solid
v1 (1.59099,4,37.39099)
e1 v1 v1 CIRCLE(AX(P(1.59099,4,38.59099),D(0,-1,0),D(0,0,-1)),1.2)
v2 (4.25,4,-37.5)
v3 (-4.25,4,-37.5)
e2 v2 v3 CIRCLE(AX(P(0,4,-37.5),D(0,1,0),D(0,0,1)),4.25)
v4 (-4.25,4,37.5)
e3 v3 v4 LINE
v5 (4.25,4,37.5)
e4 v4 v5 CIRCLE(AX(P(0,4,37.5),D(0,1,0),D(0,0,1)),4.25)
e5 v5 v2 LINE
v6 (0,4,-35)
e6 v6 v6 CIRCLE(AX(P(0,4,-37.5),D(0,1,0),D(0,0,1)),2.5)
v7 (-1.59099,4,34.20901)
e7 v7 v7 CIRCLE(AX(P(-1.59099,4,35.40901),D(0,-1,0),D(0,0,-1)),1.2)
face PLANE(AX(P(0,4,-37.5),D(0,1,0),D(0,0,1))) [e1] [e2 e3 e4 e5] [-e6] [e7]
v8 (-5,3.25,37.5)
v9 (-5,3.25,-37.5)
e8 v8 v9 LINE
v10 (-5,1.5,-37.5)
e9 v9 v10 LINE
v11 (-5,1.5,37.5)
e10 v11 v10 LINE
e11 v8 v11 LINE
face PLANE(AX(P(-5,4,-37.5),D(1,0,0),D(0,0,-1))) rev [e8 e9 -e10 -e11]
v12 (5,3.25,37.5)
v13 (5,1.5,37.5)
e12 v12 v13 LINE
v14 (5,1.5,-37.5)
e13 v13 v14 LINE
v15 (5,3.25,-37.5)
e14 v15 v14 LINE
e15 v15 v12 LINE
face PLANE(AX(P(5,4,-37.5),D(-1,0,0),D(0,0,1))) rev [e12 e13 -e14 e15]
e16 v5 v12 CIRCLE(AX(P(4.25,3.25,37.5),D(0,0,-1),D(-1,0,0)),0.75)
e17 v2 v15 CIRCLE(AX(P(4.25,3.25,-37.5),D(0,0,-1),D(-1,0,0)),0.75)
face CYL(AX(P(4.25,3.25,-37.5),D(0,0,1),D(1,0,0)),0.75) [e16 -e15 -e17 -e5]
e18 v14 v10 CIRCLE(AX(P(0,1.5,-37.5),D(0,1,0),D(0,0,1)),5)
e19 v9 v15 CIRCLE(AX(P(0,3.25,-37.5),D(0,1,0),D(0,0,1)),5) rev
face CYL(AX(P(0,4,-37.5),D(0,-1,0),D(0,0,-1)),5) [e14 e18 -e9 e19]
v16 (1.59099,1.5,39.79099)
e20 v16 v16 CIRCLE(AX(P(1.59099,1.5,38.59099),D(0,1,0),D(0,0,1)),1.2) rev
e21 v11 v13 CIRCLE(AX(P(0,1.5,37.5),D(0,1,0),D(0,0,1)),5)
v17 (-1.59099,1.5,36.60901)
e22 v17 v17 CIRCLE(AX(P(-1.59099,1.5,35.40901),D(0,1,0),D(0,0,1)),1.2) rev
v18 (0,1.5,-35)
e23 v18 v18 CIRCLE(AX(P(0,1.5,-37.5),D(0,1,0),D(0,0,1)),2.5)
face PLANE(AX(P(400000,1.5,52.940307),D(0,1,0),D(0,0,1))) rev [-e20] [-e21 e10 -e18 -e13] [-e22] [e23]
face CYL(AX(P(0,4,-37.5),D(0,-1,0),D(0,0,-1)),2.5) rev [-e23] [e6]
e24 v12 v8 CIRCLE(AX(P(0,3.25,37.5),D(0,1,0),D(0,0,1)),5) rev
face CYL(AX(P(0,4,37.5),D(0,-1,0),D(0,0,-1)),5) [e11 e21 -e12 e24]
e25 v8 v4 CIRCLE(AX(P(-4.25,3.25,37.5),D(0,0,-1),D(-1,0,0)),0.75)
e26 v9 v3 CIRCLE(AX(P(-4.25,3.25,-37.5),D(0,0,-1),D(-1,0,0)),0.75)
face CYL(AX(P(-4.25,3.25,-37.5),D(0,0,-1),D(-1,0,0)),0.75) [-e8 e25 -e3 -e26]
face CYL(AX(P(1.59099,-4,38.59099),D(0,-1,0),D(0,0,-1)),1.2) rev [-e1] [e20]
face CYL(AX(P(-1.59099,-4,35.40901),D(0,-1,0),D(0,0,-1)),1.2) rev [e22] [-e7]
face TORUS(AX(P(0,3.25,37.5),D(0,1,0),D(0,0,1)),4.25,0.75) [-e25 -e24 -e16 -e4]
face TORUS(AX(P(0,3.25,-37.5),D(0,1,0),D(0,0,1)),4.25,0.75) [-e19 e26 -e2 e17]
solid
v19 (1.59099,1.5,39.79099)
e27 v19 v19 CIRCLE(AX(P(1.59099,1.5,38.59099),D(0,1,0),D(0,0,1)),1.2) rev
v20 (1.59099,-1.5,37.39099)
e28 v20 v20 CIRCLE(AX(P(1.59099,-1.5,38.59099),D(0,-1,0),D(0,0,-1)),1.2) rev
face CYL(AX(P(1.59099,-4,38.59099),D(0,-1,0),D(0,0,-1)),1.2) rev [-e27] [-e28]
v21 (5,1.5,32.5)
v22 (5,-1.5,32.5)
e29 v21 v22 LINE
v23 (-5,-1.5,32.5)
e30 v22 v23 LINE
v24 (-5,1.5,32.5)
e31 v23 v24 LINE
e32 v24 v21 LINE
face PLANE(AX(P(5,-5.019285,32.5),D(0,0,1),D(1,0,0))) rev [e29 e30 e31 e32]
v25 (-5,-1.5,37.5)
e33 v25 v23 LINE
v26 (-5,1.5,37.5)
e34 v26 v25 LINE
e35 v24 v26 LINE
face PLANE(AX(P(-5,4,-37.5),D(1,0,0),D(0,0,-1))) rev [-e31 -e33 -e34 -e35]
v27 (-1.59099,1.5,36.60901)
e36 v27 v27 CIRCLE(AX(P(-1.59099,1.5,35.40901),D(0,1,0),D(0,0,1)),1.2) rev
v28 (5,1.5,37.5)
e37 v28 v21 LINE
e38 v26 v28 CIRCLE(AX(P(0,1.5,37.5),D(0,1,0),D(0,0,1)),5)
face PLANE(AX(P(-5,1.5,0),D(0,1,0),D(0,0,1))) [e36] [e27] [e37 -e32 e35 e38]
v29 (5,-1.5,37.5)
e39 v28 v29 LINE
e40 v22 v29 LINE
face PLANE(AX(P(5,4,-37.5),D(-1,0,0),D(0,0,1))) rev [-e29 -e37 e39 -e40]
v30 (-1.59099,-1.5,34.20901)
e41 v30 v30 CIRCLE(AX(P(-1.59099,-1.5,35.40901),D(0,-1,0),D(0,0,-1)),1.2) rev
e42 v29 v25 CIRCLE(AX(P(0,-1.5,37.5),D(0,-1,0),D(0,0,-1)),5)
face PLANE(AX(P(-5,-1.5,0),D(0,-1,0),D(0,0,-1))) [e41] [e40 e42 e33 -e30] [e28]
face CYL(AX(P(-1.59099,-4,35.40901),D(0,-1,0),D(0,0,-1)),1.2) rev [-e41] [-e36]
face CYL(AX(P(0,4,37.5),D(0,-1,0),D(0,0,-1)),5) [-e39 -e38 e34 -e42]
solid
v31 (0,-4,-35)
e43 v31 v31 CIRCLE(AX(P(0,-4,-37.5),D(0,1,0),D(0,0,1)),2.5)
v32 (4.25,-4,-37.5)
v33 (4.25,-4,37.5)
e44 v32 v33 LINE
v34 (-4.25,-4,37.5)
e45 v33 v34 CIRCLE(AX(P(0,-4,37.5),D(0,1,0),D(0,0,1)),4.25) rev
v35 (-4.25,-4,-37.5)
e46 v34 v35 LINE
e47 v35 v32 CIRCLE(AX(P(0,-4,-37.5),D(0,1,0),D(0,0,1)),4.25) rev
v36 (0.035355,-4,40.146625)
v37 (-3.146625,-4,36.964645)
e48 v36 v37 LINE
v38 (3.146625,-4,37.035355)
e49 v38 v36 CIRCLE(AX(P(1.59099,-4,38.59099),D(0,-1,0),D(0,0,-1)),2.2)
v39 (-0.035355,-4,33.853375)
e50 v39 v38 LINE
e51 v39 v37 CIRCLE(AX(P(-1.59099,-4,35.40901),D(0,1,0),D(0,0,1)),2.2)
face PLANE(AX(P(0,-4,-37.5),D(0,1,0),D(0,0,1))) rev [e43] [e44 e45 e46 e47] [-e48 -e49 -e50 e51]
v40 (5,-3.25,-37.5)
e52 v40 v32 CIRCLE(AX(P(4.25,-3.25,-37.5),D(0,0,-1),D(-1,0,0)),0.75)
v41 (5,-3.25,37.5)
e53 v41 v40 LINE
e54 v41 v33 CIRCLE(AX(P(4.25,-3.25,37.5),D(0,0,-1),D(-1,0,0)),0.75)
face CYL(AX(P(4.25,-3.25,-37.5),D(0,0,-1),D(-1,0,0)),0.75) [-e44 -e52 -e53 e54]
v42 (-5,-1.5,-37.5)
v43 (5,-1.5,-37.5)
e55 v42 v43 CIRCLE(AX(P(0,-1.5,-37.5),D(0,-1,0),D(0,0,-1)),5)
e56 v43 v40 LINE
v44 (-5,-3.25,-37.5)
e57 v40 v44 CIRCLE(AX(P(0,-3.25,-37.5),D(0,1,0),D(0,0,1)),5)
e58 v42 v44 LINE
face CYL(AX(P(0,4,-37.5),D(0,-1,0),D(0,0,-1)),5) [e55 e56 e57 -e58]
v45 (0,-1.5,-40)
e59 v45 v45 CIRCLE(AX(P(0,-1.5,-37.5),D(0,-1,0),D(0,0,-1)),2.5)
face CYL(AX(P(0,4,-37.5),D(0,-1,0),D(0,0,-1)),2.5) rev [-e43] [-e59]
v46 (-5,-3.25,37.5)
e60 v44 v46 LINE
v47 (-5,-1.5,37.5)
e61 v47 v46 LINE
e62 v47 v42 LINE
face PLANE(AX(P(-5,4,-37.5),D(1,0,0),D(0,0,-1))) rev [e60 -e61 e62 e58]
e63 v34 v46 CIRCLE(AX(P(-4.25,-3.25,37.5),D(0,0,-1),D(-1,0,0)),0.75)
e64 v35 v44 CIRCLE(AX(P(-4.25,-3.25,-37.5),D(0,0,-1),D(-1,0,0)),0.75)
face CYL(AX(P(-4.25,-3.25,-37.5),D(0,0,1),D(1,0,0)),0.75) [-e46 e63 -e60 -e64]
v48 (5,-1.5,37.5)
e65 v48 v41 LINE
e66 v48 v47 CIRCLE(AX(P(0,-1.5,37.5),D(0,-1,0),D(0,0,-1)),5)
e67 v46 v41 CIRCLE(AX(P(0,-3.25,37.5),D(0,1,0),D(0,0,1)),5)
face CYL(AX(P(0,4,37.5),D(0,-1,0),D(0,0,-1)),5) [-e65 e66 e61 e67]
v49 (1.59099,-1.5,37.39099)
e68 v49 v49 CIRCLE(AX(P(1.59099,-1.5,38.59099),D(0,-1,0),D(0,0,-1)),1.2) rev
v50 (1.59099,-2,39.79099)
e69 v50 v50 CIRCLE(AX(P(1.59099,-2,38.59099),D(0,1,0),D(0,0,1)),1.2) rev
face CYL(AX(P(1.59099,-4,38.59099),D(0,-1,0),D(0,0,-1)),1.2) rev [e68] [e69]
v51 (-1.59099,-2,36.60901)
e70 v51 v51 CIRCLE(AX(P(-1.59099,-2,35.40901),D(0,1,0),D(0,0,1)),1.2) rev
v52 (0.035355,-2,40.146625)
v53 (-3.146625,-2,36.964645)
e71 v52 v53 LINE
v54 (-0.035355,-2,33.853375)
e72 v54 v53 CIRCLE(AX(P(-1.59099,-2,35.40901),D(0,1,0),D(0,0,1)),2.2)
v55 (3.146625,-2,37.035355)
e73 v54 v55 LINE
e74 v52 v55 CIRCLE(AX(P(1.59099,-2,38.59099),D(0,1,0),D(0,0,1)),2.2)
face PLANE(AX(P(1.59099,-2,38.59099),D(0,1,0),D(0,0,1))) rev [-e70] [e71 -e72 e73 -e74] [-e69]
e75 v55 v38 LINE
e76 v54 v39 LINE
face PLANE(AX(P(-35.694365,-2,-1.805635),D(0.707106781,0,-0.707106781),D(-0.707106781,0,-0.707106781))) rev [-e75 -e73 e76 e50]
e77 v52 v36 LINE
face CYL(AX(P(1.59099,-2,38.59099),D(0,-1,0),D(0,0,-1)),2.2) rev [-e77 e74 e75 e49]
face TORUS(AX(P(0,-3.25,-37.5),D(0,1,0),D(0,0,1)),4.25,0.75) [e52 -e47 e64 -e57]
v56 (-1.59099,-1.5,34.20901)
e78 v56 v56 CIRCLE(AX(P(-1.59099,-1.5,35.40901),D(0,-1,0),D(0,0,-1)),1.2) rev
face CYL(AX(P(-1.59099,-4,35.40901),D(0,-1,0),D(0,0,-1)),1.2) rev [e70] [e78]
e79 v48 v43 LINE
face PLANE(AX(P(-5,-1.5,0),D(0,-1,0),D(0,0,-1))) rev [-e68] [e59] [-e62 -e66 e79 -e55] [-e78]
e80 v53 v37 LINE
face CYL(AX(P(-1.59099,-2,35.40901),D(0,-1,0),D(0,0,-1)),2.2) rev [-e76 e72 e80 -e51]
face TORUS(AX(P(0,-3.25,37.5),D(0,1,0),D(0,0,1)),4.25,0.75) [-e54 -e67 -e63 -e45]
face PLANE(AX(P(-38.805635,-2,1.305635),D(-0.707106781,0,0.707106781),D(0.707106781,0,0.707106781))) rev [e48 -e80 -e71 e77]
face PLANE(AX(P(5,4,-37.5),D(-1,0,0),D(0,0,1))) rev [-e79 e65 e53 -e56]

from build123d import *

# Parameters (mm, degrees)
SKETCH1_R                                       = 2.5
BOSS_EXTRUDE1_DEPTH                             = 4
CUT_EXTRUDE1_START                              = -42.5
SKETCH2_W                                       = 10
SKETCH2_H                                       = 3
CUT_EXTRUDE1_DEPTH                              = 75
CSK_FOR_M2_FLAT_HEAD_MACHINE_SCREW1_D           = 2.4
CSK_FOR_M2_FLAT_HEAD_MACHINE_SCREW1_CSINK_D     = 4.4
CSK_FOR_M2_FLAT_HEAD_MACHINE_SCREW1_CSINK_ANGLE = 90
CUT_EXTRUDE2_DEPTH                              = 2
FILLET1_R                                       = 0.75
SPLIT1_START                                    = -1.5
SPLIT1_OUTLINE_R                                = 1.2
SPLIT1_DEPTH                                    = 3
SPLIT1_2_OUTLINE_R                              = 2.5
SPLIT1_2_OUTLINE_R_2                            = 1.2
SPLIT1_2_DEPTH                                  = 5.5
SPLIT1_START_2                                  = 1.5
SPLIT1_3_OUTLINE_R                              = 1.2
SPLIT1_3_OUTLINE_R_2                            = 2.5
SPLIT1_3_DEPTH                                  = 2.5
SPLIT1_START_3                                  = -42.5000001
SPLIT1_4_DEPTH                                  = 85.0000001
SPLIT1_5_ANGLE                                  = 180
SPLIT1_6_ANGLE                                  = 180


with BuildPart() as part:
    # Sketch1 → Boss-Extrude1 (new, symmetric)
    with BuildSketch(Plane(origin=(0, 0, 0), x_dir=(1, 0, 0), z_dir=(0, 1, 0))):
        with BuildLine():
            Line((5, 37.5), (5, -37.5))
            ThreePointArc((5, -37.5), (0, -42.5), (-5, -37.5))
            Line((-5, -37.5), (-5, 37.5))
            ThreePointArc((-5, 37.5), (0, 42.5), (5, 37.5))
        make_face()
        with Locations(Location((0, 37.5, 0), (0, 0, 270))):
            Circle(SKETCH1_R, mode=Mode.SUBTRACT)
    extrude(amount=BOSS_EXTRUDE1_DEPTH, both=True)

    # Sketch2 → Cut-Extrude1 (cut)
    with BuildSketch(Plane.XY.offset(CUT_EXTRUDE1_START)):
        Rectangle(SKETCH2_W, SKETCH2_H)
    extrude(amount=CUT_EXTRUDE1_DEPTH, mode=Mode.SUBTRACT)

    # CSK for M2 Flat Head Machine Screw1 (through all)
    with Locations(Plane.XZ.offset(4)):
        with Locations((-1.590990258, 35.409009742), (1.590990258, 38.590990258)):
            CounterSinkHole(CSK_FOR_M2_FLAT_HEAD_MACHINE_SCREW1_D / 2, CSK_FOR_M2_FLAT_HEAD_MACHINE_SCREW1_CSINK_D / 2, counter_sink_angle=CSK_FOR_M2_FLAT_HEAD_MACHINE_SCREW1_CSINK_ANGLE)

    # Sketch7 → Cut-Extrude2 (cut)
    with BuildSketch(Plane(origin=(0, -4, 0), x_dir=(1, 0, 0), z_dir=(0, 1, 0))):
        with BuildLine():
            Line((-0.035355339, -33.853374824), (3.146625176, -37.035355339))
            ThreePointArc((3.146625176, -37.035355339), (3.146625176, -40.146625176), (0.035355339, -40.146625176))
            Line((0.035355339, -40.146625176), (-3.146625176, -36.964644661))
            ThreePointArc((-3.146625176, -36.964644661), (-3.146625176, -33.853374824), (-0.035355339, -33.853374824))
        make_face()
    extrude(amount=CUT_EXTRUDE2_DEPTH, mode=Mode.SUBTRACT)

    # Fillet1
    fillet1_edges = [part.edges().sort_by_distance(p)[0] for p in [
        (0, 4, 42.5),
        (5, 4, 0),
        (0, 4, -42.5),
        (5, -4, 0),
        (0, -4, 42.5),
        (-5, -4, 0),
        (0, -4, -42.5),
        (-5, 4, 0),
    ]]
    fillet(fillet1_edges, radius=FILLET1_R)

    # Split1 2 outline → Split1 2 (cut)
    with BuildSketch(Plane(origin=(0, 0, 0), x_dir=(1, 0, 0), z_dir=(0, 1, 0)).offset(SPLIT1_START)):
        with BuildLine():
            ThreePointArc((5, 37.5), (0, 42.5), (-5, 37.5))
            Line((-5, 37.5), (-5, -37.5))
            ThreePointArc((-5, -37.5), (0, -42.5), (5, -37.5))
            Line((5, -37.5), (5, 37.5))
        make_face()
        with Locations((0, 37.5)):
            Circle(SPLIT1_2_OUTLINE_R, mode=Mode.SUBTRACT)
        with Locations((1.590990258, -38.590990258)):
            Circle(SPLIT1_2_OUTLINE_R_2, mode=Mode.SUBTRACT)
        with Locations((-1.590990258, -35.409009742)):
            Circle(SPLIT1_2_OUTLINE_R_2, mode=Mode.SUBTRACT)
    extrude(amount=SPLIT1_2_DEPTH, mode=Mode.SUBTRACT)


with BuildPart() as body_2:
    # Split1: read off the stored shape, not the designer's step
    # Split1 outline → Split1 (new body)
    with BuildSketch(Plane(origin=(0, 0, 0), x_dir=(1, 0, 0), z_dir=(0, 1, 0)).offset(SPLIT1_START)):
        with BuildLine():
            Line((5, -32.5), (-5, -32.5))
            Line((-5, -32.5), (-5, -37.5))
            ThreePointArc((-5, -37.5), (0, -42.5), (5, -37.5))
            Line((5, -37.5), (5, -32.5))
        make_face()
        with Locations((1.590990258, -38.590990258)):
            Circle(SPLIT1_OUTLINE_R, mode=Mode.SUBTRACT)
        with Locations((-1.590990258, -35.409009742)):
            Circle(SPLIT1_OUTLINE_R, mode=Mode.SUBTRACT)
    extrude(amount=SPLIT1_DEPTH)


with BuildPart() as body_3:
    # Split1 3 outline → Split1 3 (new body)
    with BuildSketch(Plane(origin=(0, 0, 0), x_dir=(1, 0, 0), z_dir=(0, 1, 0)).offset(SPLIT1_START_2)):
        with BuildLine():
            ThreePointArc((5, 37.5), (0, 42.5), (-5, 37.5))
            Line((-5, 37.5), (-5, -37.5))
            ThreePointArc((-5, -37.5), (0, -42.5), (5, -37.5))
            Line((5, -37.5), (5, 37.5))
        make_face()
        with Locations((-1.590990258, -35.409009742)):
            Circle(SPLIT1_3_OUTLINE_R, mode=Mode.SUBTRACT)
        with Locations((1.590990258, -38.590990258)):
            Circle(SPLIT1_3_OUTLINE_R, mode=Mode.SUBTRACT)
        with Locations((0, 37.5)):
            Circle(SPLIT1_3_OUTLINE_R_2, mode=Mode.SUBTRACT)
    extrude(amount=SPLIT1_3_DEPTH)

    # Split1 4 outline → Split1 4 (cut)
    with BuildSketch(Plane.XY.offset(SPLIT1_START_3)):
        with BuildLine():
            ThreePointArc((-5, 3.25), (-4.780330086, 3.780330086), (-4.25, 4))
            Line((-4.25, 4), (-5, 4))
            Line((-5, 4), (-5, 3.25))
        make_face()
        with BuildLine():
            ThreePointArc((4.25, 4), (4.780330086, 3.780330086), (5, 3.25))
            Line((5, 3.25), (5, 4))
            Line((5, 4), (4.25, 4))
        make_face()
    extrude(amount=SPLIT1_4_DEPTH, mode=Mode.SUBTRACT)

    # Split1 5 outline → Split1 5 (revolve, cut)
    with BuildSketch(Plane(origin=(0, 0, 37.5), x_dir=(-1, 0, 0), z_dir=(0, 0, -1))):
        with BuildLine():
            ThreePointArc((4.25, 4), (4.780330086, 3.780330086), (5, 3.25))
            Line((5, 3.25), (5, 4))
            Line((5, 4), (4.25, 4))
        make_face()
    revolve(axis=Axis((0, 0, 37.5), (0, 1, 0)), revolution_arc=SPLIT1_5_ANGLE, mode=Mode.SUBTRACT)

    # Split1 6 outline → Split1 6 (revolve, cut)
    with BuildSketch(Plane.XY.offset(-37.5)):
        with BuildLine():
            ThreePointArc((4.25, 4), (4.780330086, 3.780330086), (5, 3.25))
            Line((5, 3.25), (5, 4))
            Line((5, 4), (4.25, 4))
        make_face()
    revolve(axis=Axis((0, 0, -37.5), (0, 1, 0)), revolution_arc=SPLIT1_6_ANGLE, mode=Mode.SUBTRACT)


solid = Compound([part.part, body_2.part, body_3.part])
